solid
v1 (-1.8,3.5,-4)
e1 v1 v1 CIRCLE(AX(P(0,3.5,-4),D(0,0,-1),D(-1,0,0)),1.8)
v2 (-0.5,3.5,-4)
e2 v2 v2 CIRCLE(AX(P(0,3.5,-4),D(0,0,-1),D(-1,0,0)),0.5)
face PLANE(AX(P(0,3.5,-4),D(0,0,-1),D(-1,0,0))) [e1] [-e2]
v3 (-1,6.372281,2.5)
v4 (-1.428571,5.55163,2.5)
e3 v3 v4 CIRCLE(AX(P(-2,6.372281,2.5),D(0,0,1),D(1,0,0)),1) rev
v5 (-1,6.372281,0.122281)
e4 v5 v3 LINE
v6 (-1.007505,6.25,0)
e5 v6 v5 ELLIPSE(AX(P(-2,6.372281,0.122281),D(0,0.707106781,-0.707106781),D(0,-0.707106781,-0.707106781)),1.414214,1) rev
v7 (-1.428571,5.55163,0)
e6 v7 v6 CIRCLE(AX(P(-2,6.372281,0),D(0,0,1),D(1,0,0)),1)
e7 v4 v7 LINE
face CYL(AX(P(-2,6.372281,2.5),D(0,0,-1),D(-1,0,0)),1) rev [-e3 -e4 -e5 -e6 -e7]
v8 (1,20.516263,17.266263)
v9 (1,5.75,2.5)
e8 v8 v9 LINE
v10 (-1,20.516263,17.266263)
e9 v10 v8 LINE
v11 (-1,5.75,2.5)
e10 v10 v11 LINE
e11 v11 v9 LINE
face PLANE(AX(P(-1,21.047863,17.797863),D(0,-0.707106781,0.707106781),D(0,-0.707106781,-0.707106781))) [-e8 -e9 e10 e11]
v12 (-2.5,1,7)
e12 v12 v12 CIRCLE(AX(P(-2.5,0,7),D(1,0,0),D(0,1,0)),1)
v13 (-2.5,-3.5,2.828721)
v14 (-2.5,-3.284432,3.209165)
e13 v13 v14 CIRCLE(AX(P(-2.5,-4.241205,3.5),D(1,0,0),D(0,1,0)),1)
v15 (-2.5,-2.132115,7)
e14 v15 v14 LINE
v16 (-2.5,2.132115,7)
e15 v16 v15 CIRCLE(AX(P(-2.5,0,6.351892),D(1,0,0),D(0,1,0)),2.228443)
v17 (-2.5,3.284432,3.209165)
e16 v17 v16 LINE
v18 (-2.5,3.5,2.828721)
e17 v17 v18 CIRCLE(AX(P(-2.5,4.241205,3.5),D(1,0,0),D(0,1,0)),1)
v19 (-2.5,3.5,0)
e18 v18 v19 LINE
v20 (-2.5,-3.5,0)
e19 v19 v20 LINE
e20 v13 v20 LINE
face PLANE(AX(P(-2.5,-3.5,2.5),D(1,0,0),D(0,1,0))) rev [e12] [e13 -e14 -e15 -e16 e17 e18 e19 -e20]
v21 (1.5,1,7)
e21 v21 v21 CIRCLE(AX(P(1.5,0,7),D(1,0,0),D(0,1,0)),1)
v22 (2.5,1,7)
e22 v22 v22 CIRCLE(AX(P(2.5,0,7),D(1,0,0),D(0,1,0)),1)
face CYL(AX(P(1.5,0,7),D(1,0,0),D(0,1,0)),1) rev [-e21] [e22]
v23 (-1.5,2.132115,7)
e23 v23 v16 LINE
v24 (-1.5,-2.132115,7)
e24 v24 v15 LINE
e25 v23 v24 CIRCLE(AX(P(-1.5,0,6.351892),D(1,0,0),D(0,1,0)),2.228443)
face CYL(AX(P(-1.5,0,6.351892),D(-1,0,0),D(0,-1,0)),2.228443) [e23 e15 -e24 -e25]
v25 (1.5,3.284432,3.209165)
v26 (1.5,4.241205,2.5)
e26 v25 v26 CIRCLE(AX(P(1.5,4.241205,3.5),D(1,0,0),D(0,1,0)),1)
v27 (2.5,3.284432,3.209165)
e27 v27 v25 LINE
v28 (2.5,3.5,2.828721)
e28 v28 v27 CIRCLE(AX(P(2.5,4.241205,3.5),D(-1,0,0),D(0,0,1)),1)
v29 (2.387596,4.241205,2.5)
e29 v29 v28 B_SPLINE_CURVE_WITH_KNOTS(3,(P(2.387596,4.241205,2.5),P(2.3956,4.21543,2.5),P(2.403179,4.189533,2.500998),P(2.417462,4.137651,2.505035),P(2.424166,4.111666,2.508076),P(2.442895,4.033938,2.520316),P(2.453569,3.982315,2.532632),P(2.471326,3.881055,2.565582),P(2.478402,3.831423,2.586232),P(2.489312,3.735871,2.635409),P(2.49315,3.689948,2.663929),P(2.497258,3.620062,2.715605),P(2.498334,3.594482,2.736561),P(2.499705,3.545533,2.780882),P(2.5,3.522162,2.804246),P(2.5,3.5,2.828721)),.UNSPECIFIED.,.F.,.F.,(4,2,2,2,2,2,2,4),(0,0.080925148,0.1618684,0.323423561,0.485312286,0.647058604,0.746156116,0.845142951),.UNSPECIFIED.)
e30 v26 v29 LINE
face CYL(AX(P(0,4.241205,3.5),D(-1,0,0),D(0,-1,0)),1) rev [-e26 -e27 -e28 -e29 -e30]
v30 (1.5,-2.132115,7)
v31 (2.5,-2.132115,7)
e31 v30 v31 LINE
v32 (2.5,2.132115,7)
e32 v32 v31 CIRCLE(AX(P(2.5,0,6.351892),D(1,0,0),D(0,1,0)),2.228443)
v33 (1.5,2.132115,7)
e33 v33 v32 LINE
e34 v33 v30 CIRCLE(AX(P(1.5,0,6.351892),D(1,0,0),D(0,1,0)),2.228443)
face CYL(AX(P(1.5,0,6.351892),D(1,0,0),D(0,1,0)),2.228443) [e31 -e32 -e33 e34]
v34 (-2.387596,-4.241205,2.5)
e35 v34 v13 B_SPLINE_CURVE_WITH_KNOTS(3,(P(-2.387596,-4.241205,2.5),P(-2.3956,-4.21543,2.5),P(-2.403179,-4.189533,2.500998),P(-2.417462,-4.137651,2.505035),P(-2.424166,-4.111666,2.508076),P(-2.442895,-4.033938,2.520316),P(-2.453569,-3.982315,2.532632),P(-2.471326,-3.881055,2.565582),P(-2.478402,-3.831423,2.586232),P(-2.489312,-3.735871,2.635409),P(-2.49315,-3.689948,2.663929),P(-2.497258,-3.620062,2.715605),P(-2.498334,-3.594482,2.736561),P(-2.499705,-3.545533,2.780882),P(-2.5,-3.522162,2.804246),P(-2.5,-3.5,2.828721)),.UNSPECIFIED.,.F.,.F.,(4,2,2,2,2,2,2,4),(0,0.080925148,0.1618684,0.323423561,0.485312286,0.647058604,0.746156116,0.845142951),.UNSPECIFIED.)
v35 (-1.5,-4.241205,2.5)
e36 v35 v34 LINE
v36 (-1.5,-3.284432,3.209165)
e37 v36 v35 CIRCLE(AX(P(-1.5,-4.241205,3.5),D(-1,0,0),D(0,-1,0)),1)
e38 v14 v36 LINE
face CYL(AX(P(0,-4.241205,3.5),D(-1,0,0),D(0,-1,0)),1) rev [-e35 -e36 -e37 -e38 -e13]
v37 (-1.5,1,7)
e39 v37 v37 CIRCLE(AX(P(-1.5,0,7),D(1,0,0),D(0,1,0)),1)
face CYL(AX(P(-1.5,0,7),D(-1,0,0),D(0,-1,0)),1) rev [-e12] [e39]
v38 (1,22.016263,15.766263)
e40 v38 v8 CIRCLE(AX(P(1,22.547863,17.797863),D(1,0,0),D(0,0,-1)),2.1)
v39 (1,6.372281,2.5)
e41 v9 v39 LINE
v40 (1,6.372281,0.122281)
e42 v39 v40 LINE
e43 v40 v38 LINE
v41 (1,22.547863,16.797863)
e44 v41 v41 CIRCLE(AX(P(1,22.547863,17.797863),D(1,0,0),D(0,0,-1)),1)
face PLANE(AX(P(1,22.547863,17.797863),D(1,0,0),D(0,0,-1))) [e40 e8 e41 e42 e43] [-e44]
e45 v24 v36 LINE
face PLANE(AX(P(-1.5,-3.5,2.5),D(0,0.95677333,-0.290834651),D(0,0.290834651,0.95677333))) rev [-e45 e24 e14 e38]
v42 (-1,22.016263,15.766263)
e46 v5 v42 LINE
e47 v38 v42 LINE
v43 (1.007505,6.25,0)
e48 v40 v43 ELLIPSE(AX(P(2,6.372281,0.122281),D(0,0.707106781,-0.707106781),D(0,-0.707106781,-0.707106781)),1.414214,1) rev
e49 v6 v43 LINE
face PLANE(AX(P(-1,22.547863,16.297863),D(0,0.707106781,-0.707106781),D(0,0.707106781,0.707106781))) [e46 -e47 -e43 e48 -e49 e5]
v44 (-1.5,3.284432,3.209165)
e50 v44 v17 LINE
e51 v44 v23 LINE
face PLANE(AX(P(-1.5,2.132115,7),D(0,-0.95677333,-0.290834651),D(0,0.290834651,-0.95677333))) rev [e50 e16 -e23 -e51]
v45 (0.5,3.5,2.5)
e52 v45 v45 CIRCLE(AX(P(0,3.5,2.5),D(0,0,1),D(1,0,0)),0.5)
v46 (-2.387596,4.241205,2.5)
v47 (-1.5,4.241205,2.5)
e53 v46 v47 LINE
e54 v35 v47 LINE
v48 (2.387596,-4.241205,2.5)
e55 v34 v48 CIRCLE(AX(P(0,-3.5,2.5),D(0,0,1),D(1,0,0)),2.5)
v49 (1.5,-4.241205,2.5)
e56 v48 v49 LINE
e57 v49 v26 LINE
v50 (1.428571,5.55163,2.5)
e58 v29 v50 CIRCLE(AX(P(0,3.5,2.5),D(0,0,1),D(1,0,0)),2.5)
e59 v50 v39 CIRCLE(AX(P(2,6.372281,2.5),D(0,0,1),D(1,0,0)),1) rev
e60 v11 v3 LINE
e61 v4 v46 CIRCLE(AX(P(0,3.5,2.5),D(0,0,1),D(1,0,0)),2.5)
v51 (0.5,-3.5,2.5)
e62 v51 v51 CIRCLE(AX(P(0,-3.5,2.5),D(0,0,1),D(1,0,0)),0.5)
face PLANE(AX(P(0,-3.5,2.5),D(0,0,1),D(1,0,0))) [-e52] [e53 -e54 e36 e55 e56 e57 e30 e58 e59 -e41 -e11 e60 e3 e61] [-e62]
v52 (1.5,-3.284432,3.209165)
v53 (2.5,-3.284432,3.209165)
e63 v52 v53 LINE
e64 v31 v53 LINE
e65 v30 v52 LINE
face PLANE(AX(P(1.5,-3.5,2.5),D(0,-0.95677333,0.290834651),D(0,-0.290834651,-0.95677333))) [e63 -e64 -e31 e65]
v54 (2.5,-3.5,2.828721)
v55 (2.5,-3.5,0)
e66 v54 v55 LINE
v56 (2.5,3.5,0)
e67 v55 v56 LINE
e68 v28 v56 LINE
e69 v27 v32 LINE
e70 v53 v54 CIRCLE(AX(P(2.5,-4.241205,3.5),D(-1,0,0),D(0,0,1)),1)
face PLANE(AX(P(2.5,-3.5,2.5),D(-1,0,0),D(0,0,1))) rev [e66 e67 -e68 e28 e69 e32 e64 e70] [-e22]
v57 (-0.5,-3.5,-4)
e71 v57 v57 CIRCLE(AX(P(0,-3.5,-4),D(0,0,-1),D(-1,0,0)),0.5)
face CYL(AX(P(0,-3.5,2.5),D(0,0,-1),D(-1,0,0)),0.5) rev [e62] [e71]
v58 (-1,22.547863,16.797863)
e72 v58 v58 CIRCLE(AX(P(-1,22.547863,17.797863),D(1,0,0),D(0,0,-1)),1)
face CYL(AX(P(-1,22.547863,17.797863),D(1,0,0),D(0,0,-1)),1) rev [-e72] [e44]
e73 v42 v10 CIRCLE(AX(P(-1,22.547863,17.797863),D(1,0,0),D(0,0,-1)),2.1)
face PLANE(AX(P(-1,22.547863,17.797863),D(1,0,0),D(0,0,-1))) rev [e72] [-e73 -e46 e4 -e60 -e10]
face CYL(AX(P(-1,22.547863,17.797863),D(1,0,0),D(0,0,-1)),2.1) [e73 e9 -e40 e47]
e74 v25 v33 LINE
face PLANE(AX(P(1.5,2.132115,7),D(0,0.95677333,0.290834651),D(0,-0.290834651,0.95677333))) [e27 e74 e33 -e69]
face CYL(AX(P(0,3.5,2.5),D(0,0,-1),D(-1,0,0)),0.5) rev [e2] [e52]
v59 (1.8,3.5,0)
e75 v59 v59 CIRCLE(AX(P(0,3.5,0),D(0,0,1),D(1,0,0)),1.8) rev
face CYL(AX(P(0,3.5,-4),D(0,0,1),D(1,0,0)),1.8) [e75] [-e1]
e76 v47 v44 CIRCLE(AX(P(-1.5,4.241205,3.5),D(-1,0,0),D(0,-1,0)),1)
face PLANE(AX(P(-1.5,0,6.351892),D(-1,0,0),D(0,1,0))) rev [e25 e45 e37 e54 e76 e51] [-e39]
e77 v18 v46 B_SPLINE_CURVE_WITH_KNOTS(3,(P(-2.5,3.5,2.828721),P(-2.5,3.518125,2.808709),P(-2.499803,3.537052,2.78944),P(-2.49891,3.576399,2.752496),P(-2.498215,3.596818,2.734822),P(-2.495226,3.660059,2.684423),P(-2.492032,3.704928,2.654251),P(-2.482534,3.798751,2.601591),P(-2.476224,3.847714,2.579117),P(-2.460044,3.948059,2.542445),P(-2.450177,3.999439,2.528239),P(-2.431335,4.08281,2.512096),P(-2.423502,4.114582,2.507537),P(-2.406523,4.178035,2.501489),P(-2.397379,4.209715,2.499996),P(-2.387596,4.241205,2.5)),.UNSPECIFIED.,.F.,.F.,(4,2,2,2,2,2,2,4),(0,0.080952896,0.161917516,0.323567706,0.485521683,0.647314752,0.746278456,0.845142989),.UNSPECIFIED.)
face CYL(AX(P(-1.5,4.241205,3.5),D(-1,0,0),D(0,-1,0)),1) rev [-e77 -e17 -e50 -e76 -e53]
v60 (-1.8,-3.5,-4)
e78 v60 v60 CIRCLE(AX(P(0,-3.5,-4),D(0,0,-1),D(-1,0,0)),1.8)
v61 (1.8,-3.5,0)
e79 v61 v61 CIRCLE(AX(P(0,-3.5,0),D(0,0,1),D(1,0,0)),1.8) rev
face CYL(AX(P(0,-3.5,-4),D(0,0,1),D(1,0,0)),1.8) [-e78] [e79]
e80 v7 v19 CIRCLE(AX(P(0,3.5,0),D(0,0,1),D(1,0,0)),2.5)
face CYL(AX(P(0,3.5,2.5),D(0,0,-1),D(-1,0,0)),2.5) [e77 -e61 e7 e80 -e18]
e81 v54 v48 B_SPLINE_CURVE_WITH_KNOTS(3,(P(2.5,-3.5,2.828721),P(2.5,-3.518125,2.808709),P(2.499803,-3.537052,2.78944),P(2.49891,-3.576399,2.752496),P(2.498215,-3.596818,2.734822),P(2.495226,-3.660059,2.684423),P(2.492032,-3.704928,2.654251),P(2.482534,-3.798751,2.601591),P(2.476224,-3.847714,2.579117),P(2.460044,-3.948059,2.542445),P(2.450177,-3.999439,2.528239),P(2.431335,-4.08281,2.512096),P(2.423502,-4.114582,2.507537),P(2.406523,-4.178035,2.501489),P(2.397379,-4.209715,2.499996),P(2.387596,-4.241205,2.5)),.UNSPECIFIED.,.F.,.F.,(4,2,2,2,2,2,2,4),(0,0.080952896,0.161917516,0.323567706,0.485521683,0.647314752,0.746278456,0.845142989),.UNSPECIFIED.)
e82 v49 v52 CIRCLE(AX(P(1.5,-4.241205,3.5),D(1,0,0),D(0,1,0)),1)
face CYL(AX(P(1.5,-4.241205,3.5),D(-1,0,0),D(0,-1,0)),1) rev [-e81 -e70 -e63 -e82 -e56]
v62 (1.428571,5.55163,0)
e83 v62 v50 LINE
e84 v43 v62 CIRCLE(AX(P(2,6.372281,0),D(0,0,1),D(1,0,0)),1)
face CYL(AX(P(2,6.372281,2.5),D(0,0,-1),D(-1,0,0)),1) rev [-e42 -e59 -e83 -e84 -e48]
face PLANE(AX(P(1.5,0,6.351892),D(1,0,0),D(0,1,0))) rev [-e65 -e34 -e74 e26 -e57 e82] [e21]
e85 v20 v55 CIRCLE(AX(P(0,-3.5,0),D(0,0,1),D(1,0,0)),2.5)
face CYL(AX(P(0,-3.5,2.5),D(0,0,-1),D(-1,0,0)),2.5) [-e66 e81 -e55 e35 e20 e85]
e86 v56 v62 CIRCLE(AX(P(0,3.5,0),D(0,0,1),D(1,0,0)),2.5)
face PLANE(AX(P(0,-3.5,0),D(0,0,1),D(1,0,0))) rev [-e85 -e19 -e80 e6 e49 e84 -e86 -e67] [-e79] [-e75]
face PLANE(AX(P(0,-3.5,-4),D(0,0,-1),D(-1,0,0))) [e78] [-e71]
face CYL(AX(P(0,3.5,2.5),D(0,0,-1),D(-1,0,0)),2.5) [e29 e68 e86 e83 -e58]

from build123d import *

# Parameters (mm, degrees)
SKETCH1_R                = 0.5
BOSS_EXTRUDE1_DEPTH      = 2.5
SKETCH2_R                = 1
BOSS_EXTRUDE2_DEPTH      = 1
FILLET1_R                = 1
BOSS_EXTRUDE4_DEPTH      = 1
BOSS_EXTRUDE4_DEPTH_BACK = 1
SKETCH3_R                = 1
FILLET2_R                = 1
BOSS_EXTRUDE5_START      = -2
SKETCH4_R                = 2.1
SKETCH4_R_2              = 1
BOSS_EXTRUDE5_DEPTH      = 2
BOSS_EXTRUDE6_START      = 4
SKETCH5_R                = 1.8
SKETCH5_R_2              = 0.5
BOSS_EXTRUDE6_DEPTH      = 4


with BuildPart() as part:
    # Sketch1 → Boss-Extrude1 (new body)
    with BuildSketch(Plane.XY):
        with BuildLine():
            Line((-2.5, -3.5), (-2.5, 3.5))
            ThreePointArc((-2.5, 3.5), (0, 6), (2.5, 3.5))
            Line((2.5, 3.5), (2.5, -3.5))
            ThreePointArc((2.5, -3.5), (0, -6), (-2.5, -3.5))
        make_face()
        with Locations((0, 3.5)):
            Circle(SKETCH1_R, mode=Mode.SUBTRACT)
        with Locations((0, -3.5)):
            Circle(SKETCH1_R, mode=Mode.SUBTRACT)
    extrude(amount=BOSS_EXTRUDE1_DEPTH)

    # Sketch2 → Boss-Extrude2 (add)
    with BuildSketch(Plane(origin=(2.5, 0, 0), x_dir=(0, 0, -1), z_dir=(1, 0, 0))):
        with BuildLine():
            Line((-7, 2.132114954), (-2.5, 3.5))
            Line((-2.5, 3.5), (-2.5, -3.5))
            Line((-2.5, -3.5), (-7, -2.132114954))
            ThreePointArc((-7, -2.132114954), (-8.580334649, 0), (-7, 2.132114954))
        make_face()
        with Locations(Location((-7, 0, 0), (0, 0, 90))):
            Circle(SKETCH2_R, mode=Mode.SUBTRACT)
    boss_extrude2 = extrude(amount=-BOSS_EXTRUDE2_DEPTH)

    # Mirror1: Boss-Extrude2 across plane
    add(boss_extrude2.mirror(Plane(origin=(0, 0, 0), x_dir=(0, 0, 1), z_dir=(1, 0, 0))))

    # Fillet1
    fillet1_edges = [part.edges().sort_by_distance(p)[0] for p in [
        (2, 3.5, 2.5),
        (2, -3.5, 2.5),
        (-2, -3.5, 2.5),
        (-2, 3.5, 2.5),
    ]]
    fillet(fillet1_edges, radius=FILLET1_R)

    # Sketch3 → Boss-Extrude4 (add, two sides: drawn at the far end of the back side and taken through both)
    with BuildSketch(Plane(origin=(0, 0, 0), x_dir=(0, 0, -1), z_dir=(1, 0, 0)).offset(-BOSS_EXTRUDE4_DEPTH_BACK)):
        with BuildLine():
            Line((-16.297863431, 22.547863431), (0, 6.25))
            Line((0, 6.25), (0, 5.75))
            Line((0, 5.75), (-2.5, 5.75))
            Line((-2.5, 5.75), (-17.797863431, 21.047863431))
            ThreePointArc((-17.797863431, 21.047863431), (-18.858523603, 23.608523603), (-16.297863431, 22.547863431))
        make_face()
        with Locations((-17.797863431, 22.547863431)):
            Circle(SKETCH3_R, mode=Mode.SUBTRACT)
    extrude(amount=BOSS_EXTRUDE4_DEPTH + BOSS_EXTRUDE4_DEPTH_BACK)

    # Fillet2
    # the kernel refuses this fillet: 1 mm, written as the material it adds along each edge
    with BuildSketch(Plane(origin=(-1, 5.791287847, 2.5), x_dir=(-0.8728024908483876, -0.4880735722909512, 0), z_dir=(0, 0, -1))) as fillet2_piece_1_section:
        with BuildLine():
            CenterArc((0.58923493, 0.995166125), FILLET2_R, 209.214041529, 55.150095421)
            Line((-0.283567561, 0.507092553), (0, 0))
            ThreePointArc((0, 0), (0.245514554, 0.012084687), (0.491029108, 0))
        make_face()
    fillet2_piece_1 = extrude(amount=2.5, mode=Mode.PRIVATE)
    fillet2_piece_1 = split(fillet2_piece_1, bisect_by=Plane(origin=(-1.294147524, 7.163115331, 0.913115331), z_dir=(0, -0.7071067811865476, 0.7071067811865476)), keep=Keep.TOP, mode=Mode.PRIVATE)
    add(fillet2_piece_1)
    with BuildSketch(Plane(origin=(1, 5.791287847, 2.5), x_dir=(0.8728024908483896, -0.4880735722909475, 0), z_dir=(0, 0, -1))) as fillet2_piece_2_section:
        with BuildLine():
            CenterArc((0.58923493, -0.995166125), FILLET2_R, 95.63586305, 55.150095421)
            Line((-0.283567561, -0.507092553), (0, 0))
            ThreePointArc((0, 0), (0.245514554, -0.012084687), (0.491029108, 0))
        make_face()
    fillet2_piece_2 = extrude(amount=2.5, mode=Mode.PRIVATE)
    fillet2_piece_2 = split(fillet2_piece_2, bisect_by=Plane(origin=(1.294147524, 7.163115331, 0.913115331), z_dir=(0, -0.7071067811865476, 0.7071067811865476)), keep=Keep.TOP, mode=Mode.PRIVATE)
    add(fillet2_piece_2)

    # Sketch4 → Boss-Extrude5 (add)
    with BuildSketch(Plane(origin=(1, 0, 0), x_dir=(0, 0, -1), z_dir=(1, 0, 0)).offset(BOSS_EXTRUDE5_START)):
        with Locations((-17.797863431, 22.547863431)):
            Circle(SKETCH4_R)
        with Locations((-17.797863431, 22.547863431)):
            Circle(SKETCH4_R_2, mode=Mode.SUBTRACT)
    extrude(amount=BOSS_EXTRUDE5_DEPTH)

    # Sketch5 → Boss-Extrude6 (add)
    # profile 1 of 2: a face of its own
    with BuildSketch(Plane(origin=(0, 0, 0), x_dir=(-1, 0, 0), z_dir=(0, 0, -1)).offset(BOSS_EXTRUDE6_START)):
        with Locations(Location((0, 3.5, 0), (0, 0, 180))):
            Circle(SKETCH5_R)
        with Locations((0, 3.5)):
            Circle(SKETCH5_R_2, mode=Mode.SUBTRACT)
    # profile 2 of 2: a face of its own
    with BuildSketch(Plane(origin=(0, 0, 0), x_dir=(-1, 0, 0), z_dir=(0, 0, -1)).offset(BOSS_EXTRUDE6_START)):
        with Locations(Location((0, -3.5, 0), (0, 0, 180))):
            Circle(SKETCH5_R)
        with Locations((0, -3.5)):
            Circle(SKETCH5_R_2, mode=Mode.SUBTRACT)
    extrude(amount=-BOSS_EXTRUDE6_DEPTH)


solid = part.part
